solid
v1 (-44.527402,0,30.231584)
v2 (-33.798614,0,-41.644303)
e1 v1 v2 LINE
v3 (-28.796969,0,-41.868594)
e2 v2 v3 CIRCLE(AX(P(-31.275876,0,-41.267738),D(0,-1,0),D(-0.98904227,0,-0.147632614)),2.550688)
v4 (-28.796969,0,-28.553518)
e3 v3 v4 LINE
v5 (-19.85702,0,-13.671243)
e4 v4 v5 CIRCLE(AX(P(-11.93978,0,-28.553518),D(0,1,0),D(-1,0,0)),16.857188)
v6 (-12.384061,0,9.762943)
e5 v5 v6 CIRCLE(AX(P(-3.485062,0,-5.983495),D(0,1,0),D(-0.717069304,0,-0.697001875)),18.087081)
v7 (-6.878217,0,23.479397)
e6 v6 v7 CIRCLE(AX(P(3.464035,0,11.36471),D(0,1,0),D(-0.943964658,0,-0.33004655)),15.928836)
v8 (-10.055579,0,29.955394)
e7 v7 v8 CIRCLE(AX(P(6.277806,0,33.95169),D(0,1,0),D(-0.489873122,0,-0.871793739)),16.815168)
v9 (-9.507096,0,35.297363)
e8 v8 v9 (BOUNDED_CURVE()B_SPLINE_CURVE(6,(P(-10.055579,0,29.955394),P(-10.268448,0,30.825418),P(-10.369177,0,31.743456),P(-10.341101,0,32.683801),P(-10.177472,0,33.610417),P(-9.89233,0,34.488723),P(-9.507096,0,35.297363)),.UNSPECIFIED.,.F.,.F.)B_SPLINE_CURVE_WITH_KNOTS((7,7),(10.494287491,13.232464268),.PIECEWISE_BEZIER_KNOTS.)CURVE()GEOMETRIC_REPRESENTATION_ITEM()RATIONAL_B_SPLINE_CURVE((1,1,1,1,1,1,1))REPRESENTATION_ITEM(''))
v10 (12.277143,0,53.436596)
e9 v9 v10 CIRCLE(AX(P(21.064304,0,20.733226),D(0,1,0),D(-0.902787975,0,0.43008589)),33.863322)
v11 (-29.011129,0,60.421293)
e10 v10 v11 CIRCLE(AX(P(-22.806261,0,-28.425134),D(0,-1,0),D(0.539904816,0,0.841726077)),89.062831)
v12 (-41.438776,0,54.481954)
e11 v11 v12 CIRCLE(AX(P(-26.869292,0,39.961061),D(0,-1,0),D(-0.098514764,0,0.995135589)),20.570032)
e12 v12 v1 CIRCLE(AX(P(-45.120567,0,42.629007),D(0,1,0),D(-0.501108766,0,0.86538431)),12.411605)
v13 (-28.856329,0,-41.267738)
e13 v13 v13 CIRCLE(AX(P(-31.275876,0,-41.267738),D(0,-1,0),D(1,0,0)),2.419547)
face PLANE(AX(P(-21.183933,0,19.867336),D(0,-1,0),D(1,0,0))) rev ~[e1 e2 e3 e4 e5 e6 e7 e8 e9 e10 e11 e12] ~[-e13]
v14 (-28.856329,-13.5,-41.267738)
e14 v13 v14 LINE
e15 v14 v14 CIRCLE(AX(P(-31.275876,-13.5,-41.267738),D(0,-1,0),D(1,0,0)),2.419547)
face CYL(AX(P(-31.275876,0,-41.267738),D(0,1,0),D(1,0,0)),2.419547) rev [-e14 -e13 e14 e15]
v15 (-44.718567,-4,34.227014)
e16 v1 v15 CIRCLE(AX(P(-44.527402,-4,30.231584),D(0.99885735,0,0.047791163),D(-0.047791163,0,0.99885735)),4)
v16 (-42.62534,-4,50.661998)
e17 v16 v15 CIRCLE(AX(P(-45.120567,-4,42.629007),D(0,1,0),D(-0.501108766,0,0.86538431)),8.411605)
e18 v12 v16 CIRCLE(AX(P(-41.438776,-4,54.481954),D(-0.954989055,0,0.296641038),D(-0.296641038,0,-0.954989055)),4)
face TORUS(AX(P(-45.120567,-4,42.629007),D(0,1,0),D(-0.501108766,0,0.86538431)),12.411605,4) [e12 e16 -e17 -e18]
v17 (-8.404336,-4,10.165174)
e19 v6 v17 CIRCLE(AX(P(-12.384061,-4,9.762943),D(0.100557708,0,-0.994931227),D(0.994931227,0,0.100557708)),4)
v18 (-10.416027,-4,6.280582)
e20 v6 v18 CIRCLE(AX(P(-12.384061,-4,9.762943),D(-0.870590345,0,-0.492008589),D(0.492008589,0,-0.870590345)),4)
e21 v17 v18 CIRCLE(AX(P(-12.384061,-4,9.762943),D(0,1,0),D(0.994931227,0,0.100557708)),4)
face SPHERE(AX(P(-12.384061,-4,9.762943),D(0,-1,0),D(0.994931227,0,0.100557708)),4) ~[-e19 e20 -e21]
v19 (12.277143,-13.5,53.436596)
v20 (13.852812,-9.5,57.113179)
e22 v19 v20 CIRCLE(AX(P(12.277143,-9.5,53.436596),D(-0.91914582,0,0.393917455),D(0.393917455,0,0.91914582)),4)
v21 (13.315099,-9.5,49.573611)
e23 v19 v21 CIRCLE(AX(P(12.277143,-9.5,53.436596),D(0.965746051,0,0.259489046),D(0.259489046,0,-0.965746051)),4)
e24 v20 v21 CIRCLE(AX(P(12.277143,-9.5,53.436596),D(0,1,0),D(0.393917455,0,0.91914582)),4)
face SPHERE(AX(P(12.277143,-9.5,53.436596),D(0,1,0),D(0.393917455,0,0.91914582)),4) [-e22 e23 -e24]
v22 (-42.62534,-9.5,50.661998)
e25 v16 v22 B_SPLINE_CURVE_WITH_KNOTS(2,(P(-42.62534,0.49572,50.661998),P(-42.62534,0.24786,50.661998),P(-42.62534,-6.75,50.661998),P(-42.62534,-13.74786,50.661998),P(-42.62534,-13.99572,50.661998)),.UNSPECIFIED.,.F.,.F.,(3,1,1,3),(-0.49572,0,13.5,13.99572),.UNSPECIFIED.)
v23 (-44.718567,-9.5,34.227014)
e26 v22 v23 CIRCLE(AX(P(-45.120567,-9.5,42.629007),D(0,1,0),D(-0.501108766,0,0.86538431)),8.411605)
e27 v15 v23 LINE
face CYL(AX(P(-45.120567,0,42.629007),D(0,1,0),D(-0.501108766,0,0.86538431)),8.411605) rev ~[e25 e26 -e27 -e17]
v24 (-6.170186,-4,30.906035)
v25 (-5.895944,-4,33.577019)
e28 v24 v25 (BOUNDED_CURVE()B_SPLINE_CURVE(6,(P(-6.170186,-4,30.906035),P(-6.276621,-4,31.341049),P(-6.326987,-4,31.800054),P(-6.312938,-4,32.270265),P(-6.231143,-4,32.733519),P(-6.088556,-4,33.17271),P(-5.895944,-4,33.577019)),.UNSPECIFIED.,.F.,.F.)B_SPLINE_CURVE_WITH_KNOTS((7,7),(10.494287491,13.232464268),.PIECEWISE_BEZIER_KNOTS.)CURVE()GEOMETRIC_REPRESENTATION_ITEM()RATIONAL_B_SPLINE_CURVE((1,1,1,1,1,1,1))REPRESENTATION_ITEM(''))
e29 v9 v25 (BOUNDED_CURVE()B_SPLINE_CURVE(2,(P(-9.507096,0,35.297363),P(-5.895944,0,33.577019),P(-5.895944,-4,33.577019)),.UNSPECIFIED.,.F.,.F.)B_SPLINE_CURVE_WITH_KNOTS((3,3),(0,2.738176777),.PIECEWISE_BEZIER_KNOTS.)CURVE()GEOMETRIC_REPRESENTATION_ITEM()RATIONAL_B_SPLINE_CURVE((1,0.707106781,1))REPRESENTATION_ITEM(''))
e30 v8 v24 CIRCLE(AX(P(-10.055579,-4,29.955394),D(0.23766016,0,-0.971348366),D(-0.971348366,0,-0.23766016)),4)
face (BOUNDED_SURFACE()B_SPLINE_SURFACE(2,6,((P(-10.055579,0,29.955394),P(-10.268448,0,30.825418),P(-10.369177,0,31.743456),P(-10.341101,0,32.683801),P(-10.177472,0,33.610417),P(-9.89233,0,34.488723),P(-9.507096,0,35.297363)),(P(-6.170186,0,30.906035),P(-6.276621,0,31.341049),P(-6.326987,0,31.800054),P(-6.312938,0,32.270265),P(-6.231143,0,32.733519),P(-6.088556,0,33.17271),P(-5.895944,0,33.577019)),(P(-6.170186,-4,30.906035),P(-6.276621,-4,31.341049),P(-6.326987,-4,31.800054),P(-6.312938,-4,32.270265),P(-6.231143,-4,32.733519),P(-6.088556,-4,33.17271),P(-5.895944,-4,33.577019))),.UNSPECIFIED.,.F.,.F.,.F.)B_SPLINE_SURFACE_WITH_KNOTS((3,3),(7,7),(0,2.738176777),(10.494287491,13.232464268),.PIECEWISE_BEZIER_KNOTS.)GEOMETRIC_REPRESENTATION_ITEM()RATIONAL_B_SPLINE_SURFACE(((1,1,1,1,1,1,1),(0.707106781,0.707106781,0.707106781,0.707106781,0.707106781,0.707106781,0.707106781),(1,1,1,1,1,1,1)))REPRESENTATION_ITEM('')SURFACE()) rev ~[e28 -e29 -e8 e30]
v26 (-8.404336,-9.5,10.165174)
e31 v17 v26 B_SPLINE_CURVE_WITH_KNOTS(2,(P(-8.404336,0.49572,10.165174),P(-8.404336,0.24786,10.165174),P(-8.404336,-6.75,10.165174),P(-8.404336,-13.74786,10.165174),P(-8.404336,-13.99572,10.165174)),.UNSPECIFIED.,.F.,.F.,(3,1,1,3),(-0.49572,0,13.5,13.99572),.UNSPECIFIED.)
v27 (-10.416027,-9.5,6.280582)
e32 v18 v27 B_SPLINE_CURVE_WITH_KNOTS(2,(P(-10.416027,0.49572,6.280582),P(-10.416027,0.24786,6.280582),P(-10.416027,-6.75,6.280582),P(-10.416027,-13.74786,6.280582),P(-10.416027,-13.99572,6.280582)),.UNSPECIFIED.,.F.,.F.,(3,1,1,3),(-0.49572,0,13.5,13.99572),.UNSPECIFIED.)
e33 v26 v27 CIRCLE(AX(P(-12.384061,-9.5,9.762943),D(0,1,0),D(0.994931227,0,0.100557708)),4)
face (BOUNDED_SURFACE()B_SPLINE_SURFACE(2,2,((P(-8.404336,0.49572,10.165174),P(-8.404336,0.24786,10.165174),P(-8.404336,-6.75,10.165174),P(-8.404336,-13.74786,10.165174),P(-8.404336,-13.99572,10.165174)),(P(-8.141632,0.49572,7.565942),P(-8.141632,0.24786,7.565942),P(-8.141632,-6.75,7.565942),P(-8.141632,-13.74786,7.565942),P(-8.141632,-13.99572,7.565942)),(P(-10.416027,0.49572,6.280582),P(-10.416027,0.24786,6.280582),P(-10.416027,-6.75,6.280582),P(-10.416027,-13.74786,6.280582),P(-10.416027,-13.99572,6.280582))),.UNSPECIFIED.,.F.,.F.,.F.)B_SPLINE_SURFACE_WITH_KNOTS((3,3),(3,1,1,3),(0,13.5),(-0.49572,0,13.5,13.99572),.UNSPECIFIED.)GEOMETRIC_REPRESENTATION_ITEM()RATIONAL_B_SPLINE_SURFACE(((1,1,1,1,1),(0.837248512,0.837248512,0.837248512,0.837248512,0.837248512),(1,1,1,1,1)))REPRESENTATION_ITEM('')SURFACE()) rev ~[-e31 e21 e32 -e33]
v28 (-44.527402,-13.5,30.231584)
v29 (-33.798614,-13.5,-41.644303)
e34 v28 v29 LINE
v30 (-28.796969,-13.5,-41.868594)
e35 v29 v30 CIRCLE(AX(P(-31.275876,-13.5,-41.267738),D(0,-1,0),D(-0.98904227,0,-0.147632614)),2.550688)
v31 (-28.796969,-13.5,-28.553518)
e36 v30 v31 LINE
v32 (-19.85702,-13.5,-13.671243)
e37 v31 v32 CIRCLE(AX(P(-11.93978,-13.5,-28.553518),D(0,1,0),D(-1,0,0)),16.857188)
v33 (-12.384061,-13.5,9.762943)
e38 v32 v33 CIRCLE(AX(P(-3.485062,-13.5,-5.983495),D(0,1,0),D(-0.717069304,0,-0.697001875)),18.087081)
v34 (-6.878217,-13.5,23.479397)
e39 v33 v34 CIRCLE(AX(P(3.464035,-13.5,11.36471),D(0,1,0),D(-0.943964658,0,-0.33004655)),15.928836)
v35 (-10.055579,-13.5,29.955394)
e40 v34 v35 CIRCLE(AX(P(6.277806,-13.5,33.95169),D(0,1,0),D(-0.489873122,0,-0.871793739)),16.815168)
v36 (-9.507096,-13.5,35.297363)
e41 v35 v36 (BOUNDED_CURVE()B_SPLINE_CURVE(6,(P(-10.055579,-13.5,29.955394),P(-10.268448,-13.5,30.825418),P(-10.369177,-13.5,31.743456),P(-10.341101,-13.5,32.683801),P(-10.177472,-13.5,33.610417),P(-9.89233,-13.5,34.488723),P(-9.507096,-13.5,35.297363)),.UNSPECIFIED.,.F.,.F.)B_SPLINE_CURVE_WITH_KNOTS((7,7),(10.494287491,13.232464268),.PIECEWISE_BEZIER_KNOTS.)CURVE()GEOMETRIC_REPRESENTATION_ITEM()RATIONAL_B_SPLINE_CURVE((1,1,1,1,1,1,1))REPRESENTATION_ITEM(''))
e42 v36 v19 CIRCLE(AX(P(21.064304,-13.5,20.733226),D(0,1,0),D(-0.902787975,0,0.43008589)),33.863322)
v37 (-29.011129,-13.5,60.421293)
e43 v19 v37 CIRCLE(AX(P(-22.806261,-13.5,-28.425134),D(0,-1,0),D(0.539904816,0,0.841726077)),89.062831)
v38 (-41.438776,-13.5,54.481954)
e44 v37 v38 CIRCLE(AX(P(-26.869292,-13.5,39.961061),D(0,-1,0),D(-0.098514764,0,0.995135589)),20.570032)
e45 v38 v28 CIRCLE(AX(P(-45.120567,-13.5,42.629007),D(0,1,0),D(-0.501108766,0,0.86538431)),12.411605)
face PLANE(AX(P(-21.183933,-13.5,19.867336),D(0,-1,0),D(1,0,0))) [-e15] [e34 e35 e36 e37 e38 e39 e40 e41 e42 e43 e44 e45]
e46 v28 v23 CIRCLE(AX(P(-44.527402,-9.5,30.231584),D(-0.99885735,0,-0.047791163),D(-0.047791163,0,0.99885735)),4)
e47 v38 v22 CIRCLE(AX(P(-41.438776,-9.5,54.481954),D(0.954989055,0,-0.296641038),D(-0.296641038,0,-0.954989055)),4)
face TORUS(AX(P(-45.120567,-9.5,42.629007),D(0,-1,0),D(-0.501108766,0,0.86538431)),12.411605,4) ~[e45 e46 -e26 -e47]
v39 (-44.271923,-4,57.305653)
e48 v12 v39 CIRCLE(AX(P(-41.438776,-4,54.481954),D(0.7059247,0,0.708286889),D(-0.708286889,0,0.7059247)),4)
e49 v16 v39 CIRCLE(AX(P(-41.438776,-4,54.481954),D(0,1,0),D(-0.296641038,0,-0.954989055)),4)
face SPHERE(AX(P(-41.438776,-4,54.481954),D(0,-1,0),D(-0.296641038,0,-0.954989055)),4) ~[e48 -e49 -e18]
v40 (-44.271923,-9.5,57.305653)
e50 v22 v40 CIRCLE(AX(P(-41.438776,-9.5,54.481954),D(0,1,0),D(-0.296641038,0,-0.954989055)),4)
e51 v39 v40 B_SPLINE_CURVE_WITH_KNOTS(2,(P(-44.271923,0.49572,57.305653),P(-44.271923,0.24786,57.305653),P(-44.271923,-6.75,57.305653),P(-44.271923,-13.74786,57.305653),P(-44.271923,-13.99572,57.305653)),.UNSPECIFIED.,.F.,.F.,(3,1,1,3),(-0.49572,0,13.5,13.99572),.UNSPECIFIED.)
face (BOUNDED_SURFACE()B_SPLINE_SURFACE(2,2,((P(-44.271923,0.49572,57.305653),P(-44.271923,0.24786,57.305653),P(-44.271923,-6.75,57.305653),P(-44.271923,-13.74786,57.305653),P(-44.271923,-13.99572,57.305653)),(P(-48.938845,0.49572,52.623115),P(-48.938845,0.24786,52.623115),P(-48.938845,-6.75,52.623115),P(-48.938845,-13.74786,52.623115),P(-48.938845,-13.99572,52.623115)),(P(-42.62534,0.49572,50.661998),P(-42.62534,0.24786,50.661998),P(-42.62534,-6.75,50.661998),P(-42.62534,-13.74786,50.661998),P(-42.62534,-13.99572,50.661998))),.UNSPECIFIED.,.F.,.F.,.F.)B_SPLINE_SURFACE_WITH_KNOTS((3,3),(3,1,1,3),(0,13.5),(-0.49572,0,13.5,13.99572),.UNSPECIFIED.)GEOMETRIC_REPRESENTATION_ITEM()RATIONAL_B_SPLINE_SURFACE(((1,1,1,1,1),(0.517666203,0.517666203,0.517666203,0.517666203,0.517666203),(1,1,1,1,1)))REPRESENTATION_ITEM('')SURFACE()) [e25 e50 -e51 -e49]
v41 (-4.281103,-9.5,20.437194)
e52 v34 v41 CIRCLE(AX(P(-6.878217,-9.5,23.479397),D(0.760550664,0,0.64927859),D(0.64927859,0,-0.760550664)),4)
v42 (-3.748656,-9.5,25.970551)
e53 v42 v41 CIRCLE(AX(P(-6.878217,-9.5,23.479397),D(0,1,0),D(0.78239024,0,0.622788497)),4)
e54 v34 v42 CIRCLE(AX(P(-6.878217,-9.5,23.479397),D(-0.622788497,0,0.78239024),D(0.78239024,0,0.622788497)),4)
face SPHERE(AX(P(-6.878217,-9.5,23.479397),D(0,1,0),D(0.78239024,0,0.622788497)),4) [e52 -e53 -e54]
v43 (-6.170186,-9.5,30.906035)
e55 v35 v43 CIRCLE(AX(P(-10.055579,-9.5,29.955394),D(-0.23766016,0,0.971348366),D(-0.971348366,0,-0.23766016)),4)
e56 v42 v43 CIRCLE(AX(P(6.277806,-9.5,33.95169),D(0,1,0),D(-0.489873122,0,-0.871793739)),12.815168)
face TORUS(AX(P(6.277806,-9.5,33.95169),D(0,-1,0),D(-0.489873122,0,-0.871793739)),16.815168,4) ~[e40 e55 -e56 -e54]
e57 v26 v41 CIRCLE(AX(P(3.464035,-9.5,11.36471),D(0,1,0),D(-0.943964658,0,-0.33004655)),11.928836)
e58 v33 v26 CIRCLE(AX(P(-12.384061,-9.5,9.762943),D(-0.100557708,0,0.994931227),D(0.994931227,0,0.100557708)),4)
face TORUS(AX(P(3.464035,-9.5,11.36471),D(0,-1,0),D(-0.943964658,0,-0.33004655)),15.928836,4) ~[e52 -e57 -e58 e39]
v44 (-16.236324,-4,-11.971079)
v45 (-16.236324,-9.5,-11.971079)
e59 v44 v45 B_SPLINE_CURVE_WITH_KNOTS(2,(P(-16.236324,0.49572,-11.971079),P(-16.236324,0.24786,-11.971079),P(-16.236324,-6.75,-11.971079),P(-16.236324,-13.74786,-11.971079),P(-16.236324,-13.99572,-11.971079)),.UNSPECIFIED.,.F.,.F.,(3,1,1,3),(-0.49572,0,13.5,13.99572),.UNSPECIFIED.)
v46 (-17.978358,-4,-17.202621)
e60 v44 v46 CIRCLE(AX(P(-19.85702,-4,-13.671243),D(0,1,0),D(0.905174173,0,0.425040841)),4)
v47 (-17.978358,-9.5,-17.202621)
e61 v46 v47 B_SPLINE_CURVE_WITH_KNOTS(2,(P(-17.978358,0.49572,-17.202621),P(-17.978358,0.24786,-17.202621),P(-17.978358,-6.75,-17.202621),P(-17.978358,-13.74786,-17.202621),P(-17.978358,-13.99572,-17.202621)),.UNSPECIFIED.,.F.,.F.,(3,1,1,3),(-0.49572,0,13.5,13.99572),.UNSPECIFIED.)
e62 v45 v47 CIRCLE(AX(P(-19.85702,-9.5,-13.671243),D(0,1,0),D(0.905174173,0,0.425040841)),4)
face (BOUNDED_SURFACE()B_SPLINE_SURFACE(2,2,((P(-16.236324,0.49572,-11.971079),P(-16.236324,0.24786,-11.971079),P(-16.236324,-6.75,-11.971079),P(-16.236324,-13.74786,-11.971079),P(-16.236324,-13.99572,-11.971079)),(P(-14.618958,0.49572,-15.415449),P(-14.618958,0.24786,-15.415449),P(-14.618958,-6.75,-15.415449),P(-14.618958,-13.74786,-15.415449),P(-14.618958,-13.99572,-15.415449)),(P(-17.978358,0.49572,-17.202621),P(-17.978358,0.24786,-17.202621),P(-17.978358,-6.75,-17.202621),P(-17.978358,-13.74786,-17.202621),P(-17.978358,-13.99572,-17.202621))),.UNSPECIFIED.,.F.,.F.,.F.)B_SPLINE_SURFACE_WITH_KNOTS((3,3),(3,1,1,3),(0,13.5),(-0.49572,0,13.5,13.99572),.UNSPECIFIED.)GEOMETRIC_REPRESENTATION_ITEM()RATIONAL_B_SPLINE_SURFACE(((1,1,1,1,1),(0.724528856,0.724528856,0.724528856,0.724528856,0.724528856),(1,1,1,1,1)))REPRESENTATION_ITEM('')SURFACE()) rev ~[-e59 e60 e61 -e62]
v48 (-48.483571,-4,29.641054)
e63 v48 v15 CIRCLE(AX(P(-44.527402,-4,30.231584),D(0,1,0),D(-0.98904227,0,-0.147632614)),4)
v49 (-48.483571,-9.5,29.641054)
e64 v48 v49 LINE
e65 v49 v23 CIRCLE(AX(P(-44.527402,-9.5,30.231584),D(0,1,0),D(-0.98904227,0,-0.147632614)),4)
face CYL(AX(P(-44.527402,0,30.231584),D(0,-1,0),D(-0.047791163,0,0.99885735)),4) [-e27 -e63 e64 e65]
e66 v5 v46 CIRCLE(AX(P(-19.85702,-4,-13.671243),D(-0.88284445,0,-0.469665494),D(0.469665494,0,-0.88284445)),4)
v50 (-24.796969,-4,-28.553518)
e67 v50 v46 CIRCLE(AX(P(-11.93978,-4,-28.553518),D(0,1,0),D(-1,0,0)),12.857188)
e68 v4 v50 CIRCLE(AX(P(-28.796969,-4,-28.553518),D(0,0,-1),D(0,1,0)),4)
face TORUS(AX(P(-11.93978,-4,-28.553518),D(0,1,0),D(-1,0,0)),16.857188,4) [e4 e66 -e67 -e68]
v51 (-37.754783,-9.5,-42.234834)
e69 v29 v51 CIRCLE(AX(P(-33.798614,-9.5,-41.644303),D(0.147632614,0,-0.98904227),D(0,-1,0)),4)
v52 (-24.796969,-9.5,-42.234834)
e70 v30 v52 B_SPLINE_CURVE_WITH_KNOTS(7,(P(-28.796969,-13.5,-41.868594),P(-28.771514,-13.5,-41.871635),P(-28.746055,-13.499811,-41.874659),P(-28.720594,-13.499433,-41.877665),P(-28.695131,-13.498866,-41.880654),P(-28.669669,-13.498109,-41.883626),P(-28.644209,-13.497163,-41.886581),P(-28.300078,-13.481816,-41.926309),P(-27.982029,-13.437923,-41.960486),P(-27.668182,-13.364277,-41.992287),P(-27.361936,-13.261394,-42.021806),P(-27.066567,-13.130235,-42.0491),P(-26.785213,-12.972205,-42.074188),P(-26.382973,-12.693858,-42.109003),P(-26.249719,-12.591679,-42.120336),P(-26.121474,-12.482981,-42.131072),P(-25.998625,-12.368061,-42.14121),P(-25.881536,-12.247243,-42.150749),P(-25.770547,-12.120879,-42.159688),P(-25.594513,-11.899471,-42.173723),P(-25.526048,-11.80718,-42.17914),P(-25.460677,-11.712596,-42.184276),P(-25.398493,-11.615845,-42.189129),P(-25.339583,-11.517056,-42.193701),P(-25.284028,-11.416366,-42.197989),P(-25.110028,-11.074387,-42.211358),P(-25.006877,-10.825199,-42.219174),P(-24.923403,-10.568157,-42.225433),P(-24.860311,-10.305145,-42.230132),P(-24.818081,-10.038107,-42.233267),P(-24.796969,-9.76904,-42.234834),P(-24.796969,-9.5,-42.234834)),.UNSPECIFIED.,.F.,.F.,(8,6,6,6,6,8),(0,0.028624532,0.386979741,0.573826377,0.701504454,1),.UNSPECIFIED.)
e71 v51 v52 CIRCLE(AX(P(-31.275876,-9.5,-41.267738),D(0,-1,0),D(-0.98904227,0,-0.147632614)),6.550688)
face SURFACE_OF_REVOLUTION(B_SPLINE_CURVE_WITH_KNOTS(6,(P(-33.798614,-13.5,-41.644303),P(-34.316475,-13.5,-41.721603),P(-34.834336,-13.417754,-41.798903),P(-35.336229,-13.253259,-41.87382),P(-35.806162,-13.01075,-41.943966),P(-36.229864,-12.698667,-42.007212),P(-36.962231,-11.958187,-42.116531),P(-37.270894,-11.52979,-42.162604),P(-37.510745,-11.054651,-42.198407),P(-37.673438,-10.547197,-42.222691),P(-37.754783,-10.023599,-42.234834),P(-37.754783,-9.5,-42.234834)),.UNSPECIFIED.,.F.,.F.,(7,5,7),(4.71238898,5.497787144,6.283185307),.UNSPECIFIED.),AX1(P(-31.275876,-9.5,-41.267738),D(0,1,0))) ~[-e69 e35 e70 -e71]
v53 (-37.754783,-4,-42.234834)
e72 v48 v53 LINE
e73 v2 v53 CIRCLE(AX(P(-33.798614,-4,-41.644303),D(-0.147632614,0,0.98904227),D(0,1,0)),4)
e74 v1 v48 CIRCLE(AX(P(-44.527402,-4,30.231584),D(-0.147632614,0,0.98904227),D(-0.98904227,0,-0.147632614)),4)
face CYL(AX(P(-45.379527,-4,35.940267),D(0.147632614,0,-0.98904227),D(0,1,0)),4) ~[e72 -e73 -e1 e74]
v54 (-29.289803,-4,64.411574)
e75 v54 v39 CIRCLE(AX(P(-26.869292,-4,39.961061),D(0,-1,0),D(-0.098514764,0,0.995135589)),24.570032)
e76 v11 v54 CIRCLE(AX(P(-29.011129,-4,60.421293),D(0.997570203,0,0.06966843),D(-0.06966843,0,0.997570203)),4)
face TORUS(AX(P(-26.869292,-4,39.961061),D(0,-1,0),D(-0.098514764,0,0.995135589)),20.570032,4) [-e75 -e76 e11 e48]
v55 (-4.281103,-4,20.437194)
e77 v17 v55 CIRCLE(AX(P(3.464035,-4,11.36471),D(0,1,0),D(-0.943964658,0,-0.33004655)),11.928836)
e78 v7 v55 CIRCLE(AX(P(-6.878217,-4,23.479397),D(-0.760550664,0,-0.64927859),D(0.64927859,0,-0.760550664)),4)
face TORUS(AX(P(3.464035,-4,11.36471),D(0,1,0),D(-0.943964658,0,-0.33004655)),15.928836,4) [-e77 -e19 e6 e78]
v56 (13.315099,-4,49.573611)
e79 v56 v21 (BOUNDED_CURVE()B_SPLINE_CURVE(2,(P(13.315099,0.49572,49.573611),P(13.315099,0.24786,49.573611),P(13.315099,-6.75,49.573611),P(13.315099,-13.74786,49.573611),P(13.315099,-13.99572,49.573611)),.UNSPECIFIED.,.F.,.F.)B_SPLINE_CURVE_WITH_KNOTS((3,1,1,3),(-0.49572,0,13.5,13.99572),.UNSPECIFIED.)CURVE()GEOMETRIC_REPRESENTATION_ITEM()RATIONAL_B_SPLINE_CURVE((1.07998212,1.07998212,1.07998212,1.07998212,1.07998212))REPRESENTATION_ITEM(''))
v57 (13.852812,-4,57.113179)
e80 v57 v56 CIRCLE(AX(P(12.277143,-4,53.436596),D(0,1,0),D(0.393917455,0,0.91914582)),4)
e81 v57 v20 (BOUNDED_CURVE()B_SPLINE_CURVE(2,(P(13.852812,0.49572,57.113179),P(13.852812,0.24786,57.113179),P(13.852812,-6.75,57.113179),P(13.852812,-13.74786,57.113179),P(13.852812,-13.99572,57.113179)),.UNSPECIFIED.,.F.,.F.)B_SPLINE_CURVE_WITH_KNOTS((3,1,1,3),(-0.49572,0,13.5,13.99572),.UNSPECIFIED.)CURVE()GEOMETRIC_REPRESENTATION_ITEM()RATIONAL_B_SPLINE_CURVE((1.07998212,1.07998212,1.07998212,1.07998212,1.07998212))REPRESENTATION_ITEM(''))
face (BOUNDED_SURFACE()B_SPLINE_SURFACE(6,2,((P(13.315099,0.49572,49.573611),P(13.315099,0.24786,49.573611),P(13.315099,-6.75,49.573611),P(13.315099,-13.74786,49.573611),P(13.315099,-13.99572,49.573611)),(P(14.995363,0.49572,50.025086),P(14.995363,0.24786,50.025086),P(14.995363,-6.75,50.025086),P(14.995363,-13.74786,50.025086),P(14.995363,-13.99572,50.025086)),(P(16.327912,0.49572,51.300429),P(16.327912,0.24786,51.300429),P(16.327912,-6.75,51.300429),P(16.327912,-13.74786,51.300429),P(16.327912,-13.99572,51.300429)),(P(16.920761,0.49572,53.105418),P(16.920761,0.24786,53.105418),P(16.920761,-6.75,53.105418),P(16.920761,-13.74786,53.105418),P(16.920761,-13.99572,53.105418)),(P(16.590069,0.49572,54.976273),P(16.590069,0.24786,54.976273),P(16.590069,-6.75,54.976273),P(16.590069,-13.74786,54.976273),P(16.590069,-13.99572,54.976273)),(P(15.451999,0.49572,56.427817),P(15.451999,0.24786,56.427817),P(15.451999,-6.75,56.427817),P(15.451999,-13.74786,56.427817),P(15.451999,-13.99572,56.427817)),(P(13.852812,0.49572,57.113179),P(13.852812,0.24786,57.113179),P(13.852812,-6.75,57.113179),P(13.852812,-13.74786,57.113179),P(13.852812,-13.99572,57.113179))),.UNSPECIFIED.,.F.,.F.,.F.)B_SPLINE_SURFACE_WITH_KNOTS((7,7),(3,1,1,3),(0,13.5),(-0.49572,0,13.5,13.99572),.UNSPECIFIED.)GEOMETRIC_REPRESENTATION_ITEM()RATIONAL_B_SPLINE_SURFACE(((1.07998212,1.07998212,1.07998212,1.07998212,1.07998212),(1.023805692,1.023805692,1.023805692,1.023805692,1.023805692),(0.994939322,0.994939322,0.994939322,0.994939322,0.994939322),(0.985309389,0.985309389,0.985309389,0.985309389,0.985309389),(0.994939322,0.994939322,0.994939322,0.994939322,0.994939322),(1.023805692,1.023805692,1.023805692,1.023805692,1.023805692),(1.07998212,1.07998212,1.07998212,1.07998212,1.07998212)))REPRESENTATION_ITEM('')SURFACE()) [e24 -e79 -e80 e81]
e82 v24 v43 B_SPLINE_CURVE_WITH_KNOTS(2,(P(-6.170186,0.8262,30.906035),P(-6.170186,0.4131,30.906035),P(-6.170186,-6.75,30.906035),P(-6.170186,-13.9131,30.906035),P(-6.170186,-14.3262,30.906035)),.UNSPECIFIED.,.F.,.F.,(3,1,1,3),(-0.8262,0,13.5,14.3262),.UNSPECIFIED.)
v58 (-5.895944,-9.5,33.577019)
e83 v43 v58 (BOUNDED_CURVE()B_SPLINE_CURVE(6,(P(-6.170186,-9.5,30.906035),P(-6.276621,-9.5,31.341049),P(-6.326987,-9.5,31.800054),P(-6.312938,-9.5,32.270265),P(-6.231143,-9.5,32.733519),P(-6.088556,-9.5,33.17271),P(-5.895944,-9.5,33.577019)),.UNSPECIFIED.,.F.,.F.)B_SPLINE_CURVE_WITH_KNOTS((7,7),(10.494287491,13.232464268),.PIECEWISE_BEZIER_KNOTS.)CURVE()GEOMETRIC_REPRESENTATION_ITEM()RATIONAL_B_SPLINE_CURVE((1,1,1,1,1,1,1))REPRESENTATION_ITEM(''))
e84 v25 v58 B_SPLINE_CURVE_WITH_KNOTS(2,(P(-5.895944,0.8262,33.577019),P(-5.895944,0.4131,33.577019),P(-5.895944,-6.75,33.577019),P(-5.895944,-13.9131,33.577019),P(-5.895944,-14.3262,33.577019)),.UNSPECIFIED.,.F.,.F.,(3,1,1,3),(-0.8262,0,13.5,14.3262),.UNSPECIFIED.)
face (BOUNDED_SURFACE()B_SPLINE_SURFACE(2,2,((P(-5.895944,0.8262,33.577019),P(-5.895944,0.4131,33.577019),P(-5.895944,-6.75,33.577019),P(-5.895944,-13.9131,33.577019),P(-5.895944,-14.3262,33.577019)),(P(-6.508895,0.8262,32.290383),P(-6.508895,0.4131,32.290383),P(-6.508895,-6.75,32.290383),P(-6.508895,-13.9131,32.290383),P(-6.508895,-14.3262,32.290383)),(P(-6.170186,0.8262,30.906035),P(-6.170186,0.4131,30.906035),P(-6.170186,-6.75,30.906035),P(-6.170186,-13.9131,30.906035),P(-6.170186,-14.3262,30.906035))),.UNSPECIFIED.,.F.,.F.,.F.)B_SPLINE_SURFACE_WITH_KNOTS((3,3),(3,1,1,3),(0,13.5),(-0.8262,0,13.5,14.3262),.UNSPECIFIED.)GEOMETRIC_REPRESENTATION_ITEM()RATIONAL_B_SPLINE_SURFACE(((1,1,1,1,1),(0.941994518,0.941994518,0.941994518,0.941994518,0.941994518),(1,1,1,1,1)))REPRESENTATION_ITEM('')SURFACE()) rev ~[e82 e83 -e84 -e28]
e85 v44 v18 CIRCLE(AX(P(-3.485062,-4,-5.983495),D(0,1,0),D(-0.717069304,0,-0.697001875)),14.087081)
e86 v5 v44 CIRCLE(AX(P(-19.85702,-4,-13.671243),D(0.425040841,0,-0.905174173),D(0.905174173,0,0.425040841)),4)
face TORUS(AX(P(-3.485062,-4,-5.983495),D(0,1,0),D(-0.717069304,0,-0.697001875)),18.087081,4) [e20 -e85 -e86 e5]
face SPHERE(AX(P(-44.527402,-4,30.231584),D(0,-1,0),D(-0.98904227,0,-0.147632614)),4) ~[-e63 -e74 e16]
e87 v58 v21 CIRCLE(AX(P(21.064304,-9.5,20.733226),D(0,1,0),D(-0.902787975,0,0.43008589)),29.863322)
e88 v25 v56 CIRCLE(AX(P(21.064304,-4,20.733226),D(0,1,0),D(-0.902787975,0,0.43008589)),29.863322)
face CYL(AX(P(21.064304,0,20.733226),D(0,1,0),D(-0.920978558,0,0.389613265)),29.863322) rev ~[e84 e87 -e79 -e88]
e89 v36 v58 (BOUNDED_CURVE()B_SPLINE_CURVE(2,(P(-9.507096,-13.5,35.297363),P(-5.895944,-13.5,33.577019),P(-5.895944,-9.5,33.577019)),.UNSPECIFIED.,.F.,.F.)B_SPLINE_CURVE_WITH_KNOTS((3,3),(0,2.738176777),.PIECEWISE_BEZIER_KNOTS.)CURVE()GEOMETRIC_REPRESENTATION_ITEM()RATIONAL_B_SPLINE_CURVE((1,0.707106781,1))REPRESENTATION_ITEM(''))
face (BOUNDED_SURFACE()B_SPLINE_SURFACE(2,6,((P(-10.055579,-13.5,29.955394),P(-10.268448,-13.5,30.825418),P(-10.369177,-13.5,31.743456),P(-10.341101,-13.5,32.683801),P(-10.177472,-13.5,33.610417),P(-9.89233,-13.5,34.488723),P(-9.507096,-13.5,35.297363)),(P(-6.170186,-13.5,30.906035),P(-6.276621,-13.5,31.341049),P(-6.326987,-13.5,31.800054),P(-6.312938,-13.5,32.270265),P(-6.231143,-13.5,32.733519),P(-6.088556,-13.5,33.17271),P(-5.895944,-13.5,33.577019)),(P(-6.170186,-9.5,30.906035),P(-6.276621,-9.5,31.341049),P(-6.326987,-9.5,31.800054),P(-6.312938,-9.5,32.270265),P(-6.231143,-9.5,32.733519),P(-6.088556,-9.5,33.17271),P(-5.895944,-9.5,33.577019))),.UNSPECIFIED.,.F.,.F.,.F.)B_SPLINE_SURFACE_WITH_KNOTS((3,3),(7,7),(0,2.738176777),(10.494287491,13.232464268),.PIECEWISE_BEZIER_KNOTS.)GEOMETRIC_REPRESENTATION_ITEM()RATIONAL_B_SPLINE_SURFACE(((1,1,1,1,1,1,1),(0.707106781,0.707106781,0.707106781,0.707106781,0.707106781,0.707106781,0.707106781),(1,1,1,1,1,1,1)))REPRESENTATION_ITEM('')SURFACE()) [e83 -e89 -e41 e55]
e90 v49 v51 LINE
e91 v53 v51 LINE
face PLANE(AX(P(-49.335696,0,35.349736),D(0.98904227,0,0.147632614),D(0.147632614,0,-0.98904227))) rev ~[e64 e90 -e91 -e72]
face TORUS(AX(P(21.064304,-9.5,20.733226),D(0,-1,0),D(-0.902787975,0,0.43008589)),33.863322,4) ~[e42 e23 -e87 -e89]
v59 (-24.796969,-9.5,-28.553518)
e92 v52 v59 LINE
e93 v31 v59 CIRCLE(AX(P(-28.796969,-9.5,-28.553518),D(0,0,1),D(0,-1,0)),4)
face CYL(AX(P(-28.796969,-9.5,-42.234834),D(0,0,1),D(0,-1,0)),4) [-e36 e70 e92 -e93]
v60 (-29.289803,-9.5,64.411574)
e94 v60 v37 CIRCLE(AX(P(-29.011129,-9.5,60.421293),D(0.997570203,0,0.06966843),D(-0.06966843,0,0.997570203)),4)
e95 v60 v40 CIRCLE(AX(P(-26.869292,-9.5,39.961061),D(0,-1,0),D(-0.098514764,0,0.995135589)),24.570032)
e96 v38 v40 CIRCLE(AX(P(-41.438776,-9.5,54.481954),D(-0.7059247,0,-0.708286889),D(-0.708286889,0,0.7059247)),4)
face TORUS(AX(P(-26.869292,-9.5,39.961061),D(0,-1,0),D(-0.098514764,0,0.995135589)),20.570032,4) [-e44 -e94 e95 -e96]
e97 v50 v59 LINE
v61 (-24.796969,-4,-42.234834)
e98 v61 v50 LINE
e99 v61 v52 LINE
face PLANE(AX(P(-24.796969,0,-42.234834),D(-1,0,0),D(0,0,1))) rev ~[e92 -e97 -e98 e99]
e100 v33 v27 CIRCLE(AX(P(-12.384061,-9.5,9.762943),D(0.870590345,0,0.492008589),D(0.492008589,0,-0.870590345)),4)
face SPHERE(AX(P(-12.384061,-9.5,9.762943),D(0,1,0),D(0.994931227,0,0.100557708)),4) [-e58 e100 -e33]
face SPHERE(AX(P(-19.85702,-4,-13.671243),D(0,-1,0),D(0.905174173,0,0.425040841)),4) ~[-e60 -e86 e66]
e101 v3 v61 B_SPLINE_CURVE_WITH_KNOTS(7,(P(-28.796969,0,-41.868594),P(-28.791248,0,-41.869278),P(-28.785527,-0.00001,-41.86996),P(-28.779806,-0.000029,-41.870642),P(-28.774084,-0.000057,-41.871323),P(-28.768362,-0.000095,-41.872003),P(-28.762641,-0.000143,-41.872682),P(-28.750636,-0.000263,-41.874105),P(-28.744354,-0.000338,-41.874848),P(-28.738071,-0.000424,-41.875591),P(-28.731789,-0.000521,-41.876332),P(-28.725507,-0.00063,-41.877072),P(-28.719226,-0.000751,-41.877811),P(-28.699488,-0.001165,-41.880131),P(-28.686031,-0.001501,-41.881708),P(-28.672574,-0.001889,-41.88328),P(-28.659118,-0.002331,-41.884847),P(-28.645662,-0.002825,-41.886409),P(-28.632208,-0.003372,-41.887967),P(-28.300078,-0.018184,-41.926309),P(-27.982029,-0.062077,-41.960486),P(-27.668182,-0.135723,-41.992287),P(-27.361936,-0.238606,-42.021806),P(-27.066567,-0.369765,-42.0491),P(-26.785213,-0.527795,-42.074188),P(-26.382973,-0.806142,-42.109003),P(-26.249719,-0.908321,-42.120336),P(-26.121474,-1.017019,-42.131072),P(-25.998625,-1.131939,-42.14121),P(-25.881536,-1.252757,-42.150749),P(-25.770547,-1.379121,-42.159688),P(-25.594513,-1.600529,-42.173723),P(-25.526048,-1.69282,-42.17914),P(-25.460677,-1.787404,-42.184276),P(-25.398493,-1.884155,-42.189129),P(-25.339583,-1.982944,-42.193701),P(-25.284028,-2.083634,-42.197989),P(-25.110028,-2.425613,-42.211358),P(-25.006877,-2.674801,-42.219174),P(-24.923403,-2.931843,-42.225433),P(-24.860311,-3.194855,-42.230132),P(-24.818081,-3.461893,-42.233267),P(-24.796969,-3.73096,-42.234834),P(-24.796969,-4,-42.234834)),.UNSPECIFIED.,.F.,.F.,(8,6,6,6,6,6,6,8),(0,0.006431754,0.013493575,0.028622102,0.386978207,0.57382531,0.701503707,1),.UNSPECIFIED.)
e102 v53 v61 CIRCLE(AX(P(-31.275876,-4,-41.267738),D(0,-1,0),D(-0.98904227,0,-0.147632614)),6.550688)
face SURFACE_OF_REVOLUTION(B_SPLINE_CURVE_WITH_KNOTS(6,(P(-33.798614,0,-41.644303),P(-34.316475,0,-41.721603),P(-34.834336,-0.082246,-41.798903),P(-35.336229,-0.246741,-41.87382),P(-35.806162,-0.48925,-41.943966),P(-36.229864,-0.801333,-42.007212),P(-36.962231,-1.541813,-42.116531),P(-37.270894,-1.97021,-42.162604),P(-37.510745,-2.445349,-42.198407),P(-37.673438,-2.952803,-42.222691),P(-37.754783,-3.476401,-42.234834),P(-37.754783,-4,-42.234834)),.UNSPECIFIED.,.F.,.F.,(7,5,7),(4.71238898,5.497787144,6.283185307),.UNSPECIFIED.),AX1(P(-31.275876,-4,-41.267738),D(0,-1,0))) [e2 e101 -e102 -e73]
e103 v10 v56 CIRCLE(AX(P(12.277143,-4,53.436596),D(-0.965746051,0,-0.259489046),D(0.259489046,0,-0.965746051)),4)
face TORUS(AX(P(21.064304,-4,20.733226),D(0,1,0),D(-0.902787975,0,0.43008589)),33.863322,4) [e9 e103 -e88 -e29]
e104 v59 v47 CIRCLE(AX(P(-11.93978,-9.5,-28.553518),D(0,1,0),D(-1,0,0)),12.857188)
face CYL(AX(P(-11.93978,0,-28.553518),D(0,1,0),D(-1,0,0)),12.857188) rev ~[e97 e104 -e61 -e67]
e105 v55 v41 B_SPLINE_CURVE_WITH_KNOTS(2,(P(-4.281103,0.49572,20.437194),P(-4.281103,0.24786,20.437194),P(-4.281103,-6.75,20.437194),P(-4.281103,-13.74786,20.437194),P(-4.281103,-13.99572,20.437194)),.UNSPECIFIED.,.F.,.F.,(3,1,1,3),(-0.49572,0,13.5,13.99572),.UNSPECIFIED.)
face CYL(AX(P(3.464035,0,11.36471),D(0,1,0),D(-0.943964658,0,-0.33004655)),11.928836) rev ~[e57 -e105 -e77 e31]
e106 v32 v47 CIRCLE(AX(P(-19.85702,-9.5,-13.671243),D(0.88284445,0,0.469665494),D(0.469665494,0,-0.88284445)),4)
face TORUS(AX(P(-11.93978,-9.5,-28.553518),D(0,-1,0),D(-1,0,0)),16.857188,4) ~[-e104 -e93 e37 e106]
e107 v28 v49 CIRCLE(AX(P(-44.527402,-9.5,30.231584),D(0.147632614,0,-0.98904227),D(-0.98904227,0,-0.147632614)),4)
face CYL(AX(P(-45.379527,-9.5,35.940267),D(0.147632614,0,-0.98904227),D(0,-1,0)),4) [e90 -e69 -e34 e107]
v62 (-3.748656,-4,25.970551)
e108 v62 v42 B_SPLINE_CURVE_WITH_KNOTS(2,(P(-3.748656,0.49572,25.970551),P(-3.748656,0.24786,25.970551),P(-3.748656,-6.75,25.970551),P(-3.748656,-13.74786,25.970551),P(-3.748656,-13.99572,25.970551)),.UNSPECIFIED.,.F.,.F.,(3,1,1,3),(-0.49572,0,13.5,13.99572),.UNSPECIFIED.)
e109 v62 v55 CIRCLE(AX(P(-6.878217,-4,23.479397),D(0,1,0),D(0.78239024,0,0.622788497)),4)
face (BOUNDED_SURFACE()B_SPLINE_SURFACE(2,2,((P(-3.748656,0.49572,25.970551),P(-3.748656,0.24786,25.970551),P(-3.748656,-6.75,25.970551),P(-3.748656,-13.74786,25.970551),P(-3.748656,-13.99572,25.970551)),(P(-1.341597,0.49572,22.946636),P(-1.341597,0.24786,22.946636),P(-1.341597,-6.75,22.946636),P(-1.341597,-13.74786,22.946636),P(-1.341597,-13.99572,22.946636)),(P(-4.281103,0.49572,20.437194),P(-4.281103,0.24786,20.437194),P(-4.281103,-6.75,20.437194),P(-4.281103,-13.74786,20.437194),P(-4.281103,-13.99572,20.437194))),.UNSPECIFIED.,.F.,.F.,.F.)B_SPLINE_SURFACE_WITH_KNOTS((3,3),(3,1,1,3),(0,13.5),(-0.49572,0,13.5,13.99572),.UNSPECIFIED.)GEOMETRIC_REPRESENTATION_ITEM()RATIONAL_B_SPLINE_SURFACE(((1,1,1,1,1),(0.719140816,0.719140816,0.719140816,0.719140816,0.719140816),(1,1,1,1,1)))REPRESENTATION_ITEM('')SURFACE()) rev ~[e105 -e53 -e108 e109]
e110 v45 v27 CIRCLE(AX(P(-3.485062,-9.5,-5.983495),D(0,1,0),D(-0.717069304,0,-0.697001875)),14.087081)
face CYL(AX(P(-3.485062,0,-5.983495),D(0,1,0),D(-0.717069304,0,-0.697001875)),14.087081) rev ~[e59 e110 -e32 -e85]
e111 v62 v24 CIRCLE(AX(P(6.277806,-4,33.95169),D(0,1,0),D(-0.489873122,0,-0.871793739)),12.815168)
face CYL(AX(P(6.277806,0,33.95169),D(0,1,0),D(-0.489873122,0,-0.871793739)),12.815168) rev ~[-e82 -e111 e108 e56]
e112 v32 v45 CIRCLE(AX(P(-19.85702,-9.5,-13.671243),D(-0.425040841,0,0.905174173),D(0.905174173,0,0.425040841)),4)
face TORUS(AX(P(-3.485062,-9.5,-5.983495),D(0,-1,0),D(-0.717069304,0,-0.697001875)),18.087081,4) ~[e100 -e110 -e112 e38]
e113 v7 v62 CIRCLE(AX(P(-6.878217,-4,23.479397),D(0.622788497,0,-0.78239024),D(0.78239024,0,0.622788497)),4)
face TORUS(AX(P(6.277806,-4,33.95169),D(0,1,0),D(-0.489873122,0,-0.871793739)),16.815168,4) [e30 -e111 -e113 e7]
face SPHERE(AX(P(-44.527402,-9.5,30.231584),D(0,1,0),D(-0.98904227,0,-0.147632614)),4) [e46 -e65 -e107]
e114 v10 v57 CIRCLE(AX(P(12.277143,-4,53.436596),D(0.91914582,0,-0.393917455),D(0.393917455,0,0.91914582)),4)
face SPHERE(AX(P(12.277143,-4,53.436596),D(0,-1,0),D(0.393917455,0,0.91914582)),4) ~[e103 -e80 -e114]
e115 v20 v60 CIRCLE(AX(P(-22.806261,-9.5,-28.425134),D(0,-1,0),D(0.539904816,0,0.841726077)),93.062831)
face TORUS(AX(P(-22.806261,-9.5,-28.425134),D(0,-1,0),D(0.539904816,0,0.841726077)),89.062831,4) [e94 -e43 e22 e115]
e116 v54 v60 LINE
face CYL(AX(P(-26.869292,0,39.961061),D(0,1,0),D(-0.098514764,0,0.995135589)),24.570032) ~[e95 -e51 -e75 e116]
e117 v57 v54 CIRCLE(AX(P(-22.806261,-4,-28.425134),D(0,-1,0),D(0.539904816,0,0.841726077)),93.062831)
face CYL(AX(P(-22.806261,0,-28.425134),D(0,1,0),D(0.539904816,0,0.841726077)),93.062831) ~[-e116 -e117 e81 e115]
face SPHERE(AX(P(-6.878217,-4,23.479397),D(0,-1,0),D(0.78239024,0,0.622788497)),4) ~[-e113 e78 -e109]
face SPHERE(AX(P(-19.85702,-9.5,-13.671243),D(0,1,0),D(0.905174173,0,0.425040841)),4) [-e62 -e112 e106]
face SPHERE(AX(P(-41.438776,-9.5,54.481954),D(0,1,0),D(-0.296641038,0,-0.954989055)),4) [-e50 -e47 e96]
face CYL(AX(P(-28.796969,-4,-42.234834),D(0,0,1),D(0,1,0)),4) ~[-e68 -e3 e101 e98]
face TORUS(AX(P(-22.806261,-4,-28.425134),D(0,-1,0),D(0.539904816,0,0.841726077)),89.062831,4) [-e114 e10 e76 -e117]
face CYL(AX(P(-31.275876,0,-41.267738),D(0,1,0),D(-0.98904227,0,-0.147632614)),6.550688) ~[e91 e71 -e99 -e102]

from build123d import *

# Parameters (mm, degrees)
F0_R     = 2.4195470085
F1_DEPTH = 13.5
F2_F1_R  = 4
F2_F2_R  = 4


with BuildPart() as f1:
    # F0 (on Front) → F1 (new body)
    with BuildSketch(Plane.XZ):
        with BuildLine():
            Line((-49.3356961767, 35.3497361023), (-37.7547828112, -42.2348335668))
            ThreePointArc((-37.7547828112, -42.2348335668), (-31.2758758664, -47.8184260428), (-24.7969689216, -42.2348335668))
            Line((-24.7969689216, -42.2348335668), (-24.7969689216, -28.5535179778))
            ThreePointArc((-24.7969689216, -28.5535179778), (-21.5958448136, -20.0642473306), (-13.5864750371, -15.8022164227))
            ThreePointArc((-13.5864750371, -15.8022164227), (-17.1539367925, -2.5764868036), (-7.7963641737, 7.4276394461))
            ThreePointArc((-7.7963641737, 7.4276394461), (-7.171857042, 16.766091593), (0, 22.7795069476))
            ThreePointArc((0, 22.7795069476), (-4.3611353912, 26.8073603633), (-6.4391756912, 32.3683722811))
            ThreePointArc((-6.4391756912, 32.3683722811), (7.334028543, 47.2529836996), (27.4388096167, 49.9082783979))
            ThreePointArc((27.4388096167, 49.9082783979), (0.2448615743, 61.737698638), (-29.2898025364, 64.4115739572))
            ThreePointArc((-29.2898025364, 64.4115739572), (-41.2715843547, 59.8673520775), (-49.3356961767, 49.9082783979))
            ThreePointArc((-49.3356961767, 49.9082783979), (-36.7089619026, 42.6290072501), (-49.3356961767, 35.3497361023))
        make_face()
        with Locations((-31.2758758664, -41.2677384298)):
            Circle(F0_R, mode=Mode.SUBTRACT)
    extrude(amount=F1_DEPTH)

    # F2: fillet of radius 4 on 26 edges, made by hand

    # F2_f1
    f2_f1_edges = [f1.edges().sort_by_distance(p)[0] for p in [
        (-6.4391756912, -6.75, 32.3683722811),
    ]]
    fillet(f2_f1_edges, radius=F2_F1_R)

    # F2_f2
    f2_f2_edges = [f1.edges().sort_by_distance(p)[0] for p in [
        (0, -6.75, 22.7795069476),
        (-3.9287601455, 0, 26.2022043612),
        (-3.9287601455, -13.5, 26.2022043612),
        (-7.7963641737, -6.75, 7.4276394461),
        (-7.171857042, 0, 16.766091593),
        (-7.171857042, -13.5, 16.766091593),
        (-13.5864750371, -6.75, -15.8022164227),
        (-17.1539367925, 0, -2.5764868036),
        (-17.1539367925, -13.5, -2.5764868036),
        (-21.5958448136, 0, -20.0642473306),
        (-21.5958448136, -13.5, -20.0642473306),
        (-49.3356961767, -6.75, 35.3497361023),
        (-43.545239494, 0, -3.4425487322),
        (-43.545239494, -13.5, -3.4425487322),
        (27.4388096167, -6.75, 49.9082783979),
        (-29.2898025364, -6.75, 64.4115739572),
        (0.2448615743, 0, 61.737698638),
        (0.2448615743, -13.5, 61.737698638),
        (-49.3356961767, -6.75, 49.9082783979),
        (-41.2715843547, 0, 59.8673520775),
        (-41.2715843547, -13.5, 59.8673520775),
        (-36.7089619026, 0, 42.6290072501),
        (-36.7089619026, -13.5, 42.6290072501),
        (-31.2758758664, -13.5, -47.8184260428),
        (-31.2758758664, 0, -47.8184260428),
        (-24.7969689216, -13.5, -35.3941757723),
        (-24.7969689216, 0, -35.3941757723),
        (-6.2638737515, -13.5, 32.2652253516),
        (-6.2638737515, 0, 32.2652253516),
    ]]
    fillet(f2_f2_edges, radius=F2_F2_R)


solid = f1.part
